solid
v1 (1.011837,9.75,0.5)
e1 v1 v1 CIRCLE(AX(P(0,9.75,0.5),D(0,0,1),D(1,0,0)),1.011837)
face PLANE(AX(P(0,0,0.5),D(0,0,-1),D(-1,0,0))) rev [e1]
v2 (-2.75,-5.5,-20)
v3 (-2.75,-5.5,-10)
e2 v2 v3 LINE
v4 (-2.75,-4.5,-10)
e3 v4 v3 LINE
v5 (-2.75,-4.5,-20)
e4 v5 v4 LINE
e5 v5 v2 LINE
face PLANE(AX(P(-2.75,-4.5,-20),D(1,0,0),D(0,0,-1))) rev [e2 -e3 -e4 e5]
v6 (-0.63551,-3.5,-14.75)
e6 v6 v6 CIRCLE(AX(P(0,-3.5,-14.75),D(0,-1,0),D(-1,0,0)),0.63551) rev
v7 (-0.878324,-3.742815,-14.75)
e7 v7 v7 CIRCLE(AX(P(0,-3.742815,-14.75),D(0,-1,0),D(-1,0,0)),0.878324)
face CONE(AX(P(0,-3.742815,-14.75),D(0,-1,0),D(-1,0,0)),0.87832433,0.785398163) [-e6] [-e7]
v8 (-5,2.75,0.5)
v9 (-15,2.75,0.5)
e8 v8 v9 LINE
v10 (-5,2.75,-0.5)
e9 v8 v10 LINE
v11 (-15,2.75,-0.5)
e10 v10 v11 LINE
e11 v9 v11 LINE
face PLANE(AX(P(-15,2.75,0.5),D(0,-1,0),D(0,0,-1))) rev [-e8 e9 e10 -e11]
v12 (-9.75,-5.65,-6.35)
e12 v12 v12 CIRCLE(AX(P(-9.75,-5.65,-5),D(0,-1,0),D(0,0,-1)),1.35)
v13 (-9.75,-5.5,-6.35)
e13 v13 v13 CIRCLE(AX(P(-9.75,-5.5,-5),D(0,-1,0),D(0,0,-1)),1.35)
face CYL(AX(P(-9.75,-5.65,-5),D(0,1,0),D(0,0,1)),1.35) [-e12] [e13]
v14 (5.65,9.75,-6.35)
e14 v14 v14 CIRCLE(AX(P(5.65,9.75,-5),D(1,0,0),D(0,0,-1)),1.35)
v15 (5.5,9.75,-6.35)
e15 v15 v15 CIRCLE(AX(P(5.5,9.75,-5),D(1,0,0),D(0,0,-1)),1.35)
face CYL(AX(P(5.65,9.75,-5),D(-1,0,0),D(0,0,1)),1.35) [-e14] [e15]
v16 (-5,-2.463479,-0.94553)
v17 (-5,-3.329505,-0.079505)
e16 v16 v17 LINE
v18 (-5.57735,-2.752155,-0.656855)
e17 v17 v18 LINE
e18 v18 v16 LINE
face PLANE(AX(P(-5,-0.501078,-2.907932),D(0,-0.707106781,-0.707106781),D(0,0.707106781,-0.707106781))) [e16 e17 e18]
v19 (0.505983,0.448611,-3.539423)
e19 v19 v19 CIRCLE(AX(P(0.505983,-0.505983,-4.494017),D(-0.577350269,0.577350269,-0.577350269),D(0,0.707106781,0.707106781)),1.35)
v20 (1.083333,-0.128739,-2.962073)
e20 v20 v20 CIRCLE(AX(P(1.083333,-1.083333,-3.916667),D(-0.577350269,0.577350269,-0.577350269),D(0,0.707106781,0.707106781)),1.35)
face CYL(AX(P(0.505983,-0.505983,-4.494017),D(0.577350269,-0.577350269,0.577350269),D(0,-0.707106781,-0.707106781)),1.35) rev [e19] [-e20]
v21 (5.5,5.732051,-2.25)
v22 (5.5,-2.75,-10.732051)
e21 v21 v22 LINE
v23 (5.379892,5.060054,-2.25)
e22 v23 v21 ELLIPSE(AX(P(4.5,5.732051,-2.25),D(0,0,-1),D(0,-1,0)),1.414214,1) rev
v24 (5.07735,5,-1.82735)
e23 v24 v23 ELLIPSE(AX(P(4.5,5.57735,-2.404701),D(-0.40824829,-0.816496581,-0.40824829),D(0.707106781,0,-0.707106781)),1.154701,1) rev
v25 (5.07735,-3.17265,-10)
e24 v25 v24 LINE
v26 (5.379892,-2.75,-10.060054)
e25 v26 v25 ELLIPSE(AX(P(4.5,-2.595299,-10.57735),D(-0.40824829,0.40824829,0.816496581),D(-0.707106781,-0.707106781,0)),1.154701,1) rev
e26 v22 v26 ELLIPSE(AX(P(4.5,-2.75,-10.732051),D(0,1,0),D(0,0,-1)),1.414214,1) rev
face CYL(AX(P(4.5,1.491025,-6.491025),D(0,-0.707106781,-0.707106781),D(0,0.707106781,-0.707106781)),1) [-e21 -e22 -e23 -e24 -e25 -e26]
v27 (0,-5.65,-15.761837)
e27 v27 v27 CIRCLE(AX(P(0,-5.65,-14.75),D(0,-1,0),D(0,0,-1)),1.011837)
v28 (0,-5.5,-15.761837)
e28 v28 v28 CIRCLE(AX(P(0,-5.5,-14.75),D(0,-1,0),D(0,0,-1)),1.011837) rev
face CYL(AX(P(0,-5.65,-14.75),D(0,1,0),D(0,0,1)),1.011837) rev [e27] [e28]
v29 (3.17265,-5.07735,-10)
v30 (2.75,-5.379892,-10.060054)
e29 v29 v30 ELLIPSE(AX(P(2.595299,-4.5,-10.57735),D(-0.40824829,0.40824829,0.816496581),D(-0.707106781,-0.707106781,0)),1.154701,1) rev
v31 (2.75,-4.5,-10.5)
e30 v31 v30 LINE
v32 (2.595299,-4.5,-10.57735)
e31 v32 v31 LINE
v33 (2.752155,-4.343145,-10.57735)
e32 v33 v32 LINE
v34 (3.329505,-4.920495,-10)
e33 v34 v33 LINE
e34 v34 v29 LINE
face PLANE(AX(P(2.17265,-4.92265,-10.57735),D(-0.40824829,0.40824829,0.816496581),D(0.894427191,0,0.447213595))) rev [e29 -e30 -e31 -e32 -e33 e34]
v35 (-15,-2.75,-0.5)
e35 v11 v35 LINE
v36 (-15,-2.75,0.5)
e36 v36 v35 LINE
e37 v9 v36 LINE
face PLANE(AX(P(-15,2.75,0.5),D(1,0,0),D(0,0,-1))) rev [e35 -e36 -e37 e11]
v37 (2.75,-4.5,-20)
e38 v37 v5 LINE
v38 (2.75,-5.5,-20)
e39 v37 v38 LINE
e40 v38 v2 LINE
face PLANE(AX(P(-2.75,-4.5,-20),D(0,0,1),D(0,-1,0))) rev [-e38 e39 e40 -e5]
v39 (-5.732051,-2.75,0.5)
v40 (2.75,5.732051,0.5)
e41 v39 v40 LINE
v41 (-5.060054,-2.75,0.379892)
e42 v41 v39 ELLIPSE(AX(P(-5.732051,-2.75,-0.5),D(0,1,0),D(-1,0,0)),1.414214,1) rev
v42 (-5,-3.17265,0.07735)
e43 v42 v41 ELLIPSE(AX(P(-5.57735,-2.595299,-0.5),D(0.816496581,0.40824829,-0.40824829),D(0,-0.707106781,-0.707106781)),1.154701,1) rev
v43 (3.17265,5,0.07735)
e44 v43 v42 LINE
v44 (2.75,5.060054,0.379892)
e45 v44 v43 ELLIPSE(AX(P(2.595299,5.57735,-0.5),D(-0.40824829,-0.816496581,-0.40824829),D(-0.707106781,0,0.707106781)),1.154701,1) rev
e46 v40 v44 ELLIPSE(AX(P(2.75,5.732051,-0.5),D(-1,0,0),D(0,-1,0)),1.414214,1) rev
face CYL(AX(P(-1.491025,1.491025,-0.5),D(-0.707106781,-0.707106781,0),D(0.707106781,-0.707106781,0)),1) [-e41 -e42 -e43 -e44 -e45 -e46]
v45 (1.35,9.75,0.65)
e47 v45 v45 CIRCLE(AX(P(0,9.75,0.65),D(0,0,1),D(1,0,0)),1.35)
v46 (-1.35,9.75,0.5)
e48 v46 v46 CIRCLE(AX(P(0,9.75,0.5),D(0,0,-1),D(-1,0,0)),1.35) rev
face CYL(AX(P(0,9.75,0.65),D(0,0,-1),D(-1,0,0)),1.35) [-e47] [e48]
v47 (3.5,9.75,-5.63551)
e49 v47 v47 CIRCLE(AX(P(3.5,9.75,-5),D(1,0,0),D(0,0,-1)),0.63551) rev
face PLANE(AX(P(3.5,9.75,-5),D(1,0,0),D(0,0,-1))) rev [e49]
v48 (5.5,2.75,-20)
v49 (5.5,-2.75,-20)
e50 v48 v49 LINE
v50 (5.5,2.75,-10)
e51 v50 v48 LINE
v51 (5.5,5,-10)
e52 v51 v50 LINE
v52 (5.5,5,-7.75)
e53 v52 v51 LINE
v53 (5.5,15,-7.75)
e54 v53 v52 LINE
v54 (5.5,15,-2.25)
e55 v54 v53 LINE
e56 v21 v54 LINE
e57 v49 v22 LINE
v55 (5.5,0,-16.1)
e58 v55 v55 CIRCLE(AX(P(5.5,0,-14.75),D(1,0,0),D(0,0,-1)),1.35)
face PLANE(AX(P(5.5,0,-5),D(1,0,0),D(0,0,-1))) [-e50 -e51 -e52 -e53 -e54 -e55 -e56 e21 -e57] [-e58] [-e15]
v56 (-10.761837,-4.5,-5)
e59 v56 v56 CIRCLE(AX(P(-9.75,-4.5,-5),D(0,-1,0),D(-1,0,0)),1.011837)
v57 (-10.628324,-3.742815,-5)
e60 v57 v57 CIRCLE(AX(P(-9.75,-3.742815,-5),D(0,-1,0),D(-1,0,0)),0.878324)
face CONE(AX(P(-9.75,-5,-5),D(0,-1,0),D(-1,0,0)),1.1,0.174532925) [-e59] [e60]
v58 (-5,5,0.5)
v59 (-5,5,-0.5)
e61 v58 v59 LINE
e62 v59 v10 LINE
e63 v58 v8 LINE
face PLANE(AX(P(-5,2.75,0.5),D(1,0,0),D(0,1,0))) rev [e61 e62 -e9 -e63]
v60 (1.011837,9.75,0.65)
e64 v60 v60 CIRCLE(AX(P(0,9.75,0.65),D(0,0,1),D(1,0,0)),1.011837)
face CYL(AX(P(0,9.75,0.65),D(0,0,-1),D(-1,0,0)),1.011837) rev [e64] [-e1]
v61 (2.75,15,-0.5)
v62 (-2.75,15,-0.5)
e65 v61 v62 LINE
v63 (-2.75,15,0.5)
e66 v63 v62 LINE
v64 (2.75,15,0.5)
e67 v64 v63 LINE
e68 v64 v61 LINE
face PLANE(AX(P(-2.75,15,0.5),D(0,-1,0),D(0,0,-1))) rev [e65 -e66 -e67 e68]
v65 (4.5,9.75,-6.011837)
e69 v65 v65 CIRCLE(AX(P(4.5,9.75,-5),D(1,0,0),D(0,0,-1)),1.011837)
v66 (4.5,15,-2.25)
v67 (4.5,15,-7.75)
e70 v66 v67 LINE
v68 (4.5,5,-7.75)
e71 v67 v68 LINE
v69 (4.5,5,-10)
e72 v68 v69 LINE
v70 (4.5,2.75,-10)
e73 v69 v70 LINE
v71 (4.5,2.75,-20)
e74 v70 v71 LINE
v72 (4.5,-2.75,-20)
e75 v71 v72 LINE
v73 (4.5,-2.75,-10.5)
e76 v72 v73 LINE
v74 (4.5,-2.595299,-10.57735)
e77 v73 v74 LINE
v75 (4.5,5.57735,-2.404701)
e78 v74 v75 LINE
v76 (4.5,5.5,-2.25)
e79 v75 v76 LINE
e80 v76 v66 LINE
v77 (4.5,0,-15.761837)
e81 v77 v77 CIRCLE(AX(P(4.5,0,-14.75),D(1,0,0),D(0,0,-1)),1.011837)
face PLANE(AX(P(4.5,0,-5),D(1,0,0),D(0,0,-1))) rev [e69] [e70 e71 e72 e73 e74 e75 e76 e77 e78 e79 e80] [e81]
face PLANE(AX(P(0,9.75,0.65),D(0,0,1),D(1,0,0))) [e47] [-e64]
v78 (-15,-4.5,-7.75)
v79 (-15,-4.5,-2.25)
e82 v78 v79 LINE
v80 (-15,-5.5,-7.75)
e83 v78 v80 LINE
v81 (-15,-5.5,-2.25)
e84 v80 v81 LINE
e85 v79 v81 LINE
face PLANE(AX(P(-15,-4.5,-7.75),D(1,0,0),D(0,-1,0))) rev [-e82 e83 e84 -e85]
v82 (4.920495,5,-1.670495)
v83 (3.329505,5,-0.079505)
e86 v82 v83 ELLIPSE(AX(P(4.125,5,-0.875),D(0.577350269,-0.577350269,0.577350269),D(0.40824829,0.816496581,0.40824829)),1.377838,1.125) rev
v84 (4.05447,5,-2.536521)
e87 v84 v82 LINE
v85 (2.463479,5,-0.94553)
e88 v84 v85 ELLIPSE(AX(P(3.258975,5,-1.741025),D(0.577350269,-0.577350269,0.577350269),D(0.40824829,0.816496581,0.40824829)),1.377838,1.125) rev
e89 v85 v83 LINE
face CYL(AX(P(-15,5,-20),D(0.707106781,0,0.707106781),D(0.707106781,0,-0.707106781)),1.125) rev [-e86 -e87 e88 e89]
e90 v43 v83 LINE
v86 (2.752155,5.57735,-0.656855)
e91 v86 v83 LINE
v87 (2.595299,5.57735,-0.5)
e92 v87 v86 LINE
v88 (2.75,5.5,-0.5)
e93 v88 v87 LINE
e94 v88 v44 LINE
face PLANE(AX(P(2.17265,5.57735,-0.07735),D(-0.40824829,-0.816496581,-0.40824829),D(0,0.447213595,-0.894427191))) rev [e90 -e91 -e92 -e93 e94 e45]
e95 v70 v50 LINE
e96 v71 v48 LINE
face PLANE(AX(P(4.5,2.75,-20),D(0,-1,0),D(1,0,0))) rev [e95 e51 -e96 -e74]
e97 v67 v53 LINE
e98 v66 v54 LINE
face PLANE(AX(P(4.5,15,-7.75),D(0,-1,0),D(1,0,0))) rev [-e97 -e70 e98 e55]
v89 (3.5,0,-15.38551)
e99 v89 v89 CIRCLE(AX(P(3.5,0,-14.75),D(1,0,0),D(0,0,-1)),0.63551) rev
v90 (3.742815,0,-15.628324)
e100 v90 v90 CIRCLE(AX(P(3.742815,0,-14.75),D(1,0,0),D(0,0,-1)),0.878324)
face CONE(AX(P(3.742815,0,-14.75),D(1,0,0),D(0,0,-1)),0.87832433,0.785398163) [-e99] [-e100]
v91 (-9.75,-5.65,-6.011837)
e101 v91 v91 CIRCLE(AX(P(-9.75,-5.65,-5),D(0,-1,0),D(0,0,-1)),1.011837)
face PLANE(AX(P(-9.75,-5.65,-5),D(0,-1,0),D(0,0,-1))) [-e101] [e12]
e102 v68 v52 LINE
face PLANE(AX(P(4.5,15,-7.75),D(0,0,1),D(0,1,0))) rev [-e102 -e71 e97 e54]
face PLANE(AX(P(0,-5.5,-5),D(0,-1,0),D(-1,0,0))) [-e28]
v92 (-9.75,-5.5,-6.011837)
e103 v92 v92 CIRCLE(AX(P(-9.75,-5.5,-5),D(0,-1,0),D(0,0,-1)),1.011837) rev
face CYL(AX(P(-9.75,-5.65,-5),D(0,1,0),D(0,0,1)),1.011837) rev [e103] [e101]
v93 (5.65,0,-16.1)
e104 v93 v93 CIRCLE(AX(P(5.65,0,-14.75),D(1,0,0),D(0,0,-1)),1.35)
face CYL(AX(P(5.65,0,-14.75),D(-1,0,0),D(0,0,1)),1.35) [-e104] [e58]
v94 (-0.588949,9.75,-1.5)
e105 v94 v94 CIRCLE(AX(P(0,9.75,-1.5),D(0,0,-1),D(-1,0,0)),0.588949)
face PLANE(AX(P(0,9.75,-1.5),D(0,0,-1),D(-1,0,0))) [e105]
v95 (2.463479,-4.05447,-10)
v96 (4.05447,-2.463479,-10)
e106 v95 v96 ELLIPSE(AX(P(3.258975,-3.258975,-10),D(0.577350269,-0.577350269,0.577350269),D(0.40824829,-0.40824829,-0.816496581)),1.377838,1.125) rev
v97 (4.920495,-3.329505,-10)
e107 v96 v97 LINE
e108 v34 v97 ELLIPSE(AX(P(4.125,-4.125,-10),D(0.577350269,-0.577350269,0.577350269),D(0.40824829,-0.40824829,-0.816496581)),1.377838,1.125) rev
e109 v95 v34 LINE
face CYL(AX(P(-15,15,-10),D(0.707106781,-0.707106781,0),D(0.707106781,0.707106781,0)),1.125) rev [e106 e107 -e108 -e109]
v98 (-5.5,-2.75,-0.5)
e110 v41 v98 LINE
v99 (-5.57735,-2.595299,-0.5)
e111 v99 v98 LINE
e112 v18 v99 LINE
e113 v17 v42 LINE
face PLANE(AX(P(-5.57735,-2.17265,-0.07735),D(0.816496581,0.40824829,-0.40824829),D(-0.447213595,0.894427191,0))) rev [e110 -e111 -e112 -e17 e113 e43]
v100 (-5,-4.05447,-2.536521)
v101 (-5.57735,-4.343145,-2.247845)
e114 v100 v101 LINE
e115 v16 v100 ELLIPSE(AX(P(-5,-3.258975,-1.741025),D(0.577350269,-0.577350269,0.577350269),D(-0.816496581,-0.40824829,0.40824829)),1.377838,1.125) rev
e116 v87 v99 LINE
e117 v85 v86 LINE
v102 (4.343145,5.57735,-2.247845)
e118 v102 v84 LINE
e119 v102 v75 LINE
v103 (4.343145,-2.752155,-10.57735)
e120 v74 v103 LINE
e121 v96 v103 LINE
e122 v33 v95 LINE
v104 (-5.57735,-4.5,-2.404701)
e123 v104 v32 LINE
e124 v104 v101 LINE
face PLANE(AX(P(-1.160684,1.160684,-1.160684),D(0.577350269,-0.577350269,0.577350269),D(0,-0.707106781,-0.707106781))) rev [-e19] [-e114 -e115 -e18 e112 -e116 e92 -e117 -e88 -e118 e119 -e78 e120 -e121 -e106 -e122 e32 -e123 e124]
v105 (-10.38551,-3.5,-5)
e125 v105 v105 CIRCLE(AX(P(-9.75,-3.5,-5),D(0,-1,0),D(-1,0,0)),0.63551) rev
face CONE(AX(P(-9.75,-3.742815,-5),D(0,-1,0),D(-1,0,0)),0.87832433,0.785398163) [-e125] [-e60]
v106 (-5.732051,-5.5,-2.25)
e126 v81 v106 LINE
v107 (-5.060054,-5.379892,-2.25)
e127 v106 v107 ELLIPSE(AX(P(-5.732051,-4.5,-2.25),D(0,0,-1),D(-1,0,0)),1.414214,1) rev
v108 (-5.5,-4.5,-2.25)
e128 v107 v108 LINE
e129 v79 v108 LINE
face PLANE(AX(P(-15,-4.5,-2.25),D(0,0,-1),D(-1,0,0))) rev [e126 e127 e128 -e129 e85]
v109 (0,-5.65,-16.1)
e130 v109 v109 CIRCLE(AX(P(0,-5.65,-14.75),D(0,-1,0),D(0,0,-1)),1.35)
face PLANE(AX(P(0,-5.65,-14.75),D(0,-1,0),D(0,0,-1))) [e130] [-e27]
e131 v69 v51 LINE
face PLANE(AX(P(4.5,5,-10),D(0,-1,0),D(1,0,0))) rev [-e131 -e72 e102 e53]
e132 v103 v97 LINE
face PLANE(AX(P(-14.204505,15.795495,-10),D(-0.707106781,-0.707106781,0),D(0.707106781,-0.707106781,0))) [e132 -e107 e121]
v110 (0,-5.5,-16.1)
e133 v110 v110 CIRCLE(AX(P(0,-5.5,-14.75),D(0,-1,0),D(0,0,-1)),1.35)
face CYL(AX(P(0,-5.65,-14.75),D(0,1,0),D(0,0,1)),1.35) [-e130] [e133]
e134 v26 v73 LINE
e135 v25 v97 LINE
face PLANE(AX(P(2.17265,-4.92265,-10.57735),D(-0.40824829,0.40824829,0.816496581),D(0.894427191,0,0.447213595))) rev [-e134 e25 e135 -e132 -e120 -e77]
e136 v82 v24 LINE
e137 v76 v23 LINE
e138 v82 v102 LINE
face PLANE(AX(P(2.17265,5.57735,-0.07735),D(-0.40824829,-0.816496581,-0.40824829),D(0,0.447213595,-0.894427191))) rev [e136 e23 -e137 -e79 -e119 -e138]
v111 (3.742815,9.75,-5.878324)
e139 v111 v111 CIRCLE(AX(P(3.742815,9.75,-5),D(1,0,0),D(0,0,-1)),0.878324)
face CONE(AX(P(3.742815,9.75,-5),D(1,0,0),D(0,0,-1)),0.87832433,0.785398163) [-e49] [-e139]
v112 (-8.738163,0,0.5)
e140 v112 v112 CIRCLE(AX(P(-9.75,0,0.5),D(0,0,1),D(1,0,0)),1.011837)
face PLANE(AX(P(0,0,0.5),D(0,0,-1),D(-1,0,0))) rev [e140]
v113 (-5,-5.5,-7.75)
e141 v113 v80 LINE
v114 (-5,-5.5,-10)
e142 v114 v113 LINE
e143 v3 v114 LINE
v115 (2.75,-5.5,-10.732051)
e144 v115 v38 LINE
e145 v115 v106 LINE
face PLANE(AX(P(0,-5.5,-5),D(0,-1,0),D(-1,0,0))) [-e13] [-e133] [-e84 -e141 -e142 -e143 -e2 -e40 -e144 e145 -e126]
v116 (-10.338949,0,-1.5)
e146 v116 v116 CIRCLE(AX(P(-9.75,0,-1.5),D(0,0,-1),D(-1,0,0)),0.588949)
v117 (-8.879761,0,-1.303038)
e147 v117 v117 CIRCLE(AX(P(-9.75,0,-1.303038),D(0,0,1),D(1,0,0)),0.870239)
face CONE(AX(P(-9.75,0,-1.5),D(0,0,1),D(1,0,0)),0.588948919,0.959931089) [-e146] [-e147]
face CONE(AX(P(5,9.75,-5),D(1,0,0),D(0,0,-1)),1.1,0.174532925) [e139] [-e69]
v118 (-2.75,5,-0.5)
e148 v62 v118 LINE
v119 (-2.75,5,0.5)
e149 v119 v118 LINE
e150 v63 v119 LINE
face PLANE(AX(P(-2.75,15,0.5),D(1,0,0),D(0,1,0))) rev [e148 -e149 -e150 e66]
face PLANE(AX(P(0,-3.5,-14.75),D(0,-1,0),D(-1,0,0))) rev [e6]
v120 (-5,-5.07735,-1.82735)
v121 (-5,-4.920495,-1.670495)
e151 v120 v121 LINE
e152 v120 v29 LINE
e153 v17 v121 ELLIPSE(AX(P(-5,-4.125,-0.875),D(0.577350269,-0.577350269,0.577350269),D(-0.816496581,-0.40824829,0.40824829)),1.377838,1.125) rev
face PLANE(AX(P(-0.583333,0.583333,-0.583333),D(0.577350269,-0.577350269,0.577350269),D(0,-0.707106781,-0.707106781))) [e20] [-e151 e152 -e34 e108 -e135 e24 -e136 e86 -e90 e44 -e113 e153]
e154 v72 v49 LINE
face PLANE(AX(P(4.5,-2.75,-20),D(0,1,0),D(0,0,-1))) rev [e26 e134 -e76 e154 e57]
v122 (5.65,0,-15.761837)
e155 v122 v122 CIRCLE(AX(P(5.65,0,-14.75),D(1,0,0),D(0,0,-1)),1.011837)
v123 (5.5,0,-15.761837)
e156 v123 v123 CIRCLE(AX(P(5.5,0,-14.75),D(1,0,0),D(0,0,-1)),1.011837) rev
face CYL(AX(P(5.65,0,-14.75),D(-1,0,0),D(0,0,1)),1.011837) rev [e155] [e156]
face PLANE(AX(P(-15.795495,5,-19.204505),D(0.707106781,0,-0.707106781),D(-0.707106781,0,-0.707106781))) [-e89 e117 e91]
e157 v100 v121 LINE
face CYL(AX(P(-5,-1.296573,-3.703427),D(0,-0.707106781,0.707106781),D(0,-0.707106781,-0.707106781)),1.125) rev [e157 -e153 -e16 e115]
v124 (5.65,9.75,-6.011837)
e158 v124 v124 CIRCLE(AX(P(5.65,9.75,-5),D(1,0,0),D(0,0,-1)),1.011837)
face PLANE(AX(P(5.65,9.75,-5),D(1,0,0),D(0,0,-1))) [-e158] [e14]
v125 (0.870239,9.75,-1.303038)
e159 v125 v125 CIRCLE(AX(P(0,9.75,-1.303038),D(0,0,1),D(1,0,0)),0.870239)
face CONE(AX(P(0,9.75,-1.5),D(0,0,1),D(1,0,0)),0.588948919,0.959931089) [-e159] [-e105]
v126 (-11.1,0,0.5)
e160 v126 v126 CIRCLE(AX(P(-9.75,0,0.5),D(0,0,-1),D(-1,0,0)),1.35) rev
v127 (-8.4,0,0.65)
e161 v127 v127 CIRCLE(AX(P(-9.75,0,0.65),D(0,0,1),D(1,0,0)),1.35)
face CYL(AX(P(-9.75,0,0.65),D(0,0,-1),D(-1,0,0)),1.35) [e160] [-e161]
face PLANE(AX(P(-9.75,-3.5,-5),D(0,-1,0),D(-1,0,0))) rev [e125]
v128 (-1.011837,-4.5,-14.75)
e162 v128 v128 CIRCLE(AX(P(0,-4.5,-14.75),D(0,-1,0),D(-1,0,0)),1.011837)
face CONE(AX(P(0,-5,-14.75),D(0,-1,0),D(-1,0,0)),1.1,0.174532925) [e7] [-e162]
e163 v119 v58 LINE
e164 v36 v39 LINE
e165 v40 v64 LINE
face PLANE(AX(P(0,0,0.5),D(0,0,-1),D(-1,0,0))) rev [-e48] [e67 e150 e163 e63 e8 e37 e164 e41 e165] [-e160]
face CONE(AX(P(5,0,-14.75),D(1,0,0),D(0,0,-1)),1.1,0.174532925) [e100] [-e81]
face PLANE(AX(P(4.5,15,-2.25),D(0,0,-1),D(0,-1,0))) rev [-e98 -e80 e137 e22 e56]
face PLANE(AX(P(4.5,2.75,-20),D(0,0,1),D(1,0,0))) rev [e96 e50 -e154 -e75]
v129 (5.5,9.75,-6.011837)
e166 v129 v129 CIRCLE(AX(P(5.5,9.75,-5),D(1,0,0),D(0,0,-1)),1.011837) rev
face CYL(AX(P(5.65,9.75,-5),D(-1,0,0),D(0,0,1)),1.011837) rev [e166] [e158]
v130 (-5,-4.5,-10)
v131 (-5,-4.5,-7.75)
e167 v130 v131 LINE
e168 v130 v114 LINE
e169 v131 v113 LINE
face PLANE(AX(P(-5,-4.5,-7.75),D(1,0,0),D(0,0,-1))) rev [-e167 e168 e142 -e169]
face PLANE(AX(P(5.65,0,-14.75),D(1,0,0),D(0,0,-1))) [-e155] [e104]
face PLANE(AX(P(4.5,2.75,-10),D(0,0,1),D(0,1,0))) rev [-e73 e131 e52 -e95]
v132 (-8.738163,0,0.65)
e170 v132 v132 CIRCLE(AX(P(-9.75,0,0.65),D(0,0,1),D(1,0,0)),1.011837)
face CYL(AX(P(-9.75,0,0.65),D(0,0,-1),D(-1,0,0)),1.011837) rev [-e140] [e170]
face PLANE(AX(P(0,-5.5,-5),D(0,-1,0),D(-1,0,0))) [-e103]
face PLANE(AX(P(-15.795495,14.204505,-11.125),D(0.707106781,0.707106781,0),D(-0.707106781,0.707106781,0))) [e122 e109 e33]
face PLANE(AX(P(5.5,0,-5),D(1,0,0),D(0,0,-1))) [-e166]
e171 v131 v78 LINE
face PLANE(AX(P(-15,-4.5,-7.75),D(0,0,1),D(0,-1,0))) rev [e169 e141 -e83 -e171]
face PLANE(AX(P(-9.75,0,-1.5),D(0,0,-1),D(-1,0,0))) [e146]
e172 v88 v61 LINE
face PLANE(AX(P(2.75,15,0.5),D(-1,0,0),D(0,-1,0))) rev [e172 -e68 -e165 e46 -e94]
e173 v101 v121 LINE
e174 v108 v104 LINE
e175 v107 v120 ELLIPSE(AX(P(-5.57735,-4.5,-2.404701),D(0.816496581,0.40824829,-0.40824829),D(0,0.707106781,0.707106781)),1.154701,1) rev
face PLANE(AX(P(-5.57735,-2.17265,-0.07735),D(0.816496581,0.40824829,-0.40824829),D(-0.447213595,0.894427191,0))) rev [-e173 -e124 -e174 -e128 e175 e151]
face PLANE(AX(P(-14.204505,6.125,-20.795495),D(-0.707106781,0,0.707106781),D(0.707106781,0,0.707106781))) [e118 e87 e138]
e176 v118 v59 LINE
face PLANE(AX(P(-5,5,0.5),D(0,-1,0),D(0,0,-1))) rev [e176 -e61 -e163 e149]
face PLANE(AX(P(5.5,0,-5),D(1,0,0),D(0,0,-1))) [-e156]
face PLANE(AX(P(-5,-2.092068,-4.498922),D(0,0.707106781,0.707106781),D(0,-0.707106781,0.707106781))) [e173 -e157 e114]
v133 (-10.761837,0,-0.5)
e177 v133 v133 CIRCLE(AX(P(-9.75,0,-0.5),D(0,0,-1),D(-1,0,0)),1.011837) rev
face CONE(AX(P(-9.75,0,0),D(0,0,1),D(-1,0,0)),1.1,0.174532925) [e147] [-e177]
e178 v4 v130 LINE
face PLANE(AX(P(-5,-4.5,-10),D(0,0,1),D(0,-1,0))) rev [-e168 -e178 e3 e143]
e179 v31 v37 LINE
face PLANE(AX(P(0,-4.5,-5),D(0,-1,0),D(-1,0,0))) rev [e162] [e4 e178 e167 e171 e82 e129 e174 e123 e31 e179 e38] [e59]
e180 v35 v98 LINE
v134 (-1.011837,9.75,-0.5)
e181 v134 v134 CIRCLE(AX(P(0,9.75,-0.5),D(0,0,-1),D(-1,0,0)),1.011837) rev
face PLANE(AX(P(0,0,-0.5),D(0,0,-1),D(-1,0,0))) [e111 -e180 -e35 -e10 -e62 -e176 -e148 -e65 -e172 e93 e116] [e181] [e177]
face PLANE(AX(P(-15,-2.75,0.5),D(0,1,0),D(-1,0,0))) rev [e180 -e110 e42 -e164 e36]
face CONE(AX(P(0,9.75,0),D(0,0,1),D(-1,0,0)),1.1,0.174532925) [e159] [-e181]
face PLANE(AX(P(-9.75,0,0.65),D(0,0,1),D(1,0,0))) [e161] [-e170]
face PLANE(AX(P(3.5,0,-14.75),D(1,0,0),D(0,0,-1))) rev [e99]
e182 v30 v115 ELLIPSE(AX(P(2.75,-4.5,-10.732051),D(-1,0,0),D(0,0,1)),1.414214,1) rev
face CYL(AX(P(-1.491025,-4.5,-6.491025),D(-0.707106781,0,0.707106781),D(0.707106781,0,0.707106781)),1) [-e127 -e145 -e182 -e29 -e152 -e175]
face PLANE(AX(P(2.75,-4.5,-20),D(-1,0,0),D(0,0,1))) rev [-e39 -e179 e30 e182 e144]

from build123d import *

# Parameters (mm, degrees)
BOSS_EXTRUDE1_DEPTH           = 0.5
SKETCH6_R                     = 1.1
BOSS_EXTRUDE3_DEPTH           = 1.5
BOSS_EXTRUDE3_TAPER           = 10
BOSS_EXTRUDE3_OTHER_WAY_DEPTH = 1.5
BOSS_EXTRUDE3_OTHER_WAY_TAPER = 10
CHAMFER1_SIZE                 = 0.24656061
CHAMFER1_SIZE_2               = 0.2
CIRPATTERN2_COUNT             = 2
CIRPATTERN2_ANGLE             = 270
CIRPATTERN3_COUNT             = 2
CIRPATTERN3_ANGLE             = 90
CUT_EXTRUDE8_DEPTH            = 33.330326321
CUT_EXTRUDE10_DEPTH           = 30.5
CUT_EXTRUDE11_DEPTH           = 33.330326321
SKETCH8_R                     = 1.35
SKETCH8_R_2                   = 1.01183651
BOSS_EXTRUDE4_DEPTH           = 0.15
SKETCH12_R                    = 1.35
SKETCH12_R_2                  = 1.01183651
BOSS_EXTRUDE5_DEPTH           = 0.15
SKETCH13_R                    = 1.35
SKETCH13_R_2                  = 1.01183651
BOSS_EXTRUDE6_DEPTH           = 0.15
SKETCH2_R                     = 1.35
BOSS_EXTRUDE2_DEPTH           = 1
FILLET1_R                     = 1
CUT_EXTRUDE2_DEPTH            = 34.638240887
CUT_EXTRUDE4_DEPTH            = 32.129266776
CUT_EXTRUDE6_DEPTH            = 4


with BuildPart() as part:
    # Sketch1 → Boss-Extrude1 (new, symmetric)
    with BuildSketch(Plane.XY):
        Polygon((-5, 2.75), (-5, 5), (-2.75, 5), (-2.75, 15), (2.75, 15), (2.75, 5), (-5, -2.75), (-15, -2.75), (-15, 2.75), align=None)
    extrude(amount=BOSS_EXTRUDE1_DEPTH, both=True)

    # Sketch6 → Boss-Extrude3 (add)
    with BuildSketch(Plane(origin=(0, -0.5, 0), x_dir=(-1, 0, 0), z_dir=(0, 0, -1))):
        with Locations((0, 10.25)):
            Circle(SKETCH6_R)
        with Locations((9.75, 0.5)):
            Circle(SKETCH6_R)
    extrude(amount=BOSS_EXTRUDE3_DEPTH, taper=BOSS_EXTRUDE3_TAPER)

    # Sketch6 → Boss-Extrude3 other way (add)
    with BuildSketch(Plane(origin=(0, -0.5, 0), x_dir=(-1, 0, 0), z_dir=(0, 0, -1))):
        with Locations((0, 10.25)):
            Circle(SKETCH6_R)
        with Locations((9.75, 0.5)):
            Circle(SKETCH6_R)
    extrude(amount=-BOSS_EXTRUDE3_OTHER_WAY_DEPTH, taper=BOSS_EXTRUDE3_OTHER_WAY_TAPER)

    # Chamfer1
    # the kernel refuses this chamfer: 0.24656061, 0.2 mm, written as the material it takes off along each edge
    with BuildSketch(Plane(origin=(0, 9.75, 1.5), x_dir=(-1, 0, 0), z_dir=(0, -1, 0))) as chamfer1_piece_1:
        Polygon((0.835509529 + CHAMFER1_SIZE * 0.173648177924, CHAMFER1_SIZE * 0.984807754467), (0.835509529 - CHAMFER1_SIZE_2, 0), (0.835509529, 0), align=None)
    revolve(axis=Axis((0, 9.75, 1.5), (0, 0, -1)), mode=Mode.SUBTRACT)
    with BuildSketch(Plane(origin=(0, 9.75, -1.5), x_dir=(-1, 0, 0), z_dir=(0, 1, 0))) as chamfer1_piece_2:
        Polygon((0.835509529 + CHAMFER1_SIZE_2 * 0.173648177667, CHAMFER1_SIZE_2 * 0.984807753012), (0.835509529 - CHAMFER1_SIZE * 1.00000000148, 0), (0.835509529, 0), align=None)
    revolve(axis=Axis((0, 9.75, -1.5), (0, 0, 1)), mode=Mode.SUBTRACT)
    with BuildSketch(Plane(origin=(-9.75, 0, 1.5), x_dir=(-1, 0, 0), z_dir=(0, -1, 0))) as chamfer1_piece_3:
        Polygon((0.835509529 + CHAMFER1_SIZE * 0.173648177924, CHAMFER1_SIZE * 0.984807754467), (0.835509529 - CHAMFER1_SIZE_2, 0), (0.835509529, 0), align=None)
    revolve(axis=Axis((-9.75, 0, 1.5), (0, 0, -1)), mode=Mode.SUBTRACT)
    with BuildSketch(Plane(origin=(-9.75, 0, -1.5), x_dir=(-1, 0, 0), z_dir=(0, 1, 0))) as chamfer1_piece_4:
        Polygon((0.835509529 + CHAMFER1_SIZE_2 * 0.173648177667, CHAMFER1_SIZE_2 * 0.984807753012), (0.835509529 - CHAMFER1_SIZE * 1.00000000148, 0), (0.835509529, 0), align=None)
    revolve(axis=Axis((-9.75, 0, -1.5), (0, 0, 1)), mode=Mode.SUBTRACT)


with BuildPart() as cirpattern2_1:
    # CirPattern2: pattern copy
    add(part.part.rotate(Axis((0, -5, 0), (1, 0, 0)), 1 * CIRPATTERN2_ANGLE / (CIRPATTERN2_COUNT - 1)))

    # Sketch9 → Cut-Extrude8 (cut, through all)
    with BuildSketch(Plane.XZ.offset(5.5)):
        Polygon((-5, -10), (-2.75, -10), (-2.75, -20), (2.75, -20), (2.75, -10), (-5, -2.25), (-15, -2.25), (-15, -7.75), (-5, -7.75), align=None)
    extrude(amount=CUT_EXTRUDE8_DEPTH, mode=Mode.SUBTRACT)

    # Sketch12 → Boss-Extrude5 (add)
    # profile 1 of 2: a face of its own
    with BuildSketch(Plane.XZ.offset(5.5)):
        with Locations(Location((-9.75, -5, 0), (0, 0, 270))):
            Circle(SKETCH12_R)
        with Locations(Location((-9.75, -5, 0), (0, 0, 270))):
            Circle(SKETCH12_R_2, mode=Mode.SUBTRACT)
    # profile 2 of 2: a face of its own
    with BuildSketch(Plane.XZ.offset(5.5)):
        with Locations(Location((0, -14.75, 0), (0, 0, 270))):
            Circle(SKETCH12_R)
        with Locations(Location((0, -14.75, 0), (0, 0, 270))):
            Circle(SKETCH12_R_2, mode=Mode.SUBTRACT)
    extrude(amount=BOSS_EXTRUDE5_DEPTH)


with BuildPart() as cirpattern3_1:
    # CirPattern3: pattern copy
    add(part.part.rotate(Axis((5, 0, 0), (0, -1, 0)), 1 * CIRPATTERN3_ANGLE / (CIRPATTERN3_COUNT - 1)))

    # Sketch11 → Cut-Extrude11 (cut, through all)
    with BuildSketch(Plane(origin=(5.5, 0, 0), x_dir=(0, 0, -1), z_dir=(1, 0, 0))):
        Polygon((10, 5), (7.75, 5), (7.75, 15), (2.25, 15), (2.25, 5), (10, -2.75), (20, -2.75), (20, 2.75), (10, 2.75), align=None)
    extrude(amount=CUT_EXTRUDE11_DEPTH, mode=Mode.SUBTRACT)

    # Sketch13 → Boss-Extrude6 (add)
    # profile 1 of 2: a face of its own
    with BuildSketch(Plane(origin=(5.5, 0, 0), x_dir=(0, 0, -1), z_dir=(1, 0, 0))):
        with Locations((14.75, 0)):
            Circle(SKETCH13_R)
        with Locations((14.75, 0)):
            Circle(SKETCH13_R_2, mode=Mode.SUBTRACT)
    # profile 2 of 2: a face of its own
    with BuildSketch(Plane(origin=(5.5, 0, 0), x_dir=(0, 0, -1), z_dir=(1, 0, 0))):
        with Locations((5, 9.75)):
            Circle(SKETCH13_R)
        with Locations((5, 9.75)):
            Circle(SKETCH13_R_2, mode=Mode.SUBTRACT)
    extrude(amount=BOSS_EXTRUDE6_DEPTH)


with BuildPart() as part_1:
    add(part.part)

    # Sketch10 → Cut-Extrude10 (cut, through all)
    with BuildSketch(Plane.XY.offset(0.5)):
        Polygon((-2.75, 5), (-5, 5), (-5, 2.75), (-15, 2.75), (-15, -2.75), (-5, -2.75), (2.75, 5), (2.75, 15), (-2.75, 15), align=None)
    extrude(amount=CUT_EXTRUDE10_DEPTH, mode=Mode.SUBTRACT)

    # Sketch8 → Boss-Extrude4 (add)
    # profile 1 of 2: a face of its own
    with BuildSketch(Plane.XY.offset(0.5)):
        with Locations(Location((-9.75, 0, 0), (0, 0, 180))):
            Circle(SKETCH8_R)
        with Locations((-9.75, 0)):
            Circle(SKETCH8_R_2, mode=Mode.SUBTRACT)
    # profile 2 of 2: a face of its own
    with BuildSketch(Plane.XY.offset(0.5)):
        with Locations(Location((0, 9.75, 0), (0, 0, 180))):
            Circle(SKETCH8_R)
        with Locations((0, 9.75)):
            Circle(SKETCH8_R_2, mode=Mode.SUBTRACT)
    extrude(amount=BOSS_EXTRUDE4_DEPTH)

    add(cirpattern2_1.part)  # Boss-Extrude2 merges CirPattern2_1

    add(cirpattern3_1.part)  # Boss-Extrude2 merges CirPattern3_1
    # Sketch2 → Boss-Extrude2 (add)
    with BuildSketch(Plane(origin=(-0.583333333, 0.583333333, -0.583333333), x_dir=(0.8164965809277334, 0.4082482904638652, -0.40824829046384614), z_dir=(-0.5773502691896154, 0.5773502691896445, -0.5773502691896175))):
        Polygon((7.450531301, 9.01561146), (7.450531301, -1.944543648), (4.082482905, -3.889087297), (-5.409289849, 1.590990258), (-5.409289849, 5.480077554), (4.082482905, 10.960155108), align=None)
        with Locations(Location((2.041241452, 3.535533906, 0), (0, 0, 270))):
            Circle(SKETCH2_R, mode=Mode.SUBTRACT)
    extrude(amount=BOSS_EXTRUDE2_DEPTH)

    # Fillet1
    fillet1_edges = [part_1.edges().sort_by_distance(p)[0] for p in [
        (-1.125, 1.125, 0.5),
        (-1.125, -5.5, -6.125),
        (5.5, 1.125, -6.125),
    ]]
    fillet(fillet1_edges, radius=FILLET1_R)

    # Sketch3 → Cut-Extrude2 (cut, through all)
    with BuildSketch(Plane(origin=(4.125, -4.125, 0), x_dir=(0.7071067811865475, 0.7071067811865477, -2.769222492809729e-15), z_dir=(-0.7071067811865477, 0.7071067811865475, -2.769222492809729e-15))):
        with BuildLine():
            Line((1.125, 10), (1.125, 11.125))
            Line((1.125, 11.125), (-1.125, 11.125))
            Line((-1.125, 11.125), (-1.125, 10))
            ThreePointArc((-1.125, 10), (0, 8.875), (1.125, 10))
        make_face()
    extrude(amount=CUT_EXTRUDE2_DEPTH, mode=Mode.SUBTRACT)

    # Sketch4 → Cut-Extrude4 (cut, through all)
    with BuildSketch(Plane(origin=(1.625, 0, 1.625), x_dir=(-0.7071067811865487, 2.4677036874675166e-14, 0.7071067811865465), z_dir=(-0.7071067811865465, -2.4677036874675254e-14, -0.7071067811865487))):
        with BuildLine():
            Line((-2.410533906, 5), (-2.410533906, 6.125))
            Line((-2.410533906, 6.125), (-4.660533906, 6.125))
            Line((-4.660533906, 6.125), (-4.660533906, 5))
            ThreePointArc((-4.660533906, 5), (-3.535533906, 3.875), (-2.410533906, 5))
        make_face()
    extrude(amount=CUT_EXTRUDE4_DEPTH, mode=Mode.SUBTRACT)

    # Sketch5 → Cut-Extrude6 (cut)
    with BuildSketch(Plane(origin=(0, -1.625, 1.625), x_dir=(-1, 0, 0), z_dir=(-5.877305542968418e-15, 0.7071067811865465, -0.7071067811865486))):
        with BuildLine():
            Line((5, -4.660533906), (6.125, -4.660533906))
            Line((6.125, -4.660533906), (6.125, -2.410533906))
            Line((6.125, -2.410533906), (5, -2.410533906))
            ThreePointArc((5, -2.410533906), (3.875, -3.535533906), (5, -4.660533906))
        make_face()
    extrude(amount=CUT_EXTRUDE6_DEPTH, mode=Mode.SUBTRACT)


solid = part_1.part
